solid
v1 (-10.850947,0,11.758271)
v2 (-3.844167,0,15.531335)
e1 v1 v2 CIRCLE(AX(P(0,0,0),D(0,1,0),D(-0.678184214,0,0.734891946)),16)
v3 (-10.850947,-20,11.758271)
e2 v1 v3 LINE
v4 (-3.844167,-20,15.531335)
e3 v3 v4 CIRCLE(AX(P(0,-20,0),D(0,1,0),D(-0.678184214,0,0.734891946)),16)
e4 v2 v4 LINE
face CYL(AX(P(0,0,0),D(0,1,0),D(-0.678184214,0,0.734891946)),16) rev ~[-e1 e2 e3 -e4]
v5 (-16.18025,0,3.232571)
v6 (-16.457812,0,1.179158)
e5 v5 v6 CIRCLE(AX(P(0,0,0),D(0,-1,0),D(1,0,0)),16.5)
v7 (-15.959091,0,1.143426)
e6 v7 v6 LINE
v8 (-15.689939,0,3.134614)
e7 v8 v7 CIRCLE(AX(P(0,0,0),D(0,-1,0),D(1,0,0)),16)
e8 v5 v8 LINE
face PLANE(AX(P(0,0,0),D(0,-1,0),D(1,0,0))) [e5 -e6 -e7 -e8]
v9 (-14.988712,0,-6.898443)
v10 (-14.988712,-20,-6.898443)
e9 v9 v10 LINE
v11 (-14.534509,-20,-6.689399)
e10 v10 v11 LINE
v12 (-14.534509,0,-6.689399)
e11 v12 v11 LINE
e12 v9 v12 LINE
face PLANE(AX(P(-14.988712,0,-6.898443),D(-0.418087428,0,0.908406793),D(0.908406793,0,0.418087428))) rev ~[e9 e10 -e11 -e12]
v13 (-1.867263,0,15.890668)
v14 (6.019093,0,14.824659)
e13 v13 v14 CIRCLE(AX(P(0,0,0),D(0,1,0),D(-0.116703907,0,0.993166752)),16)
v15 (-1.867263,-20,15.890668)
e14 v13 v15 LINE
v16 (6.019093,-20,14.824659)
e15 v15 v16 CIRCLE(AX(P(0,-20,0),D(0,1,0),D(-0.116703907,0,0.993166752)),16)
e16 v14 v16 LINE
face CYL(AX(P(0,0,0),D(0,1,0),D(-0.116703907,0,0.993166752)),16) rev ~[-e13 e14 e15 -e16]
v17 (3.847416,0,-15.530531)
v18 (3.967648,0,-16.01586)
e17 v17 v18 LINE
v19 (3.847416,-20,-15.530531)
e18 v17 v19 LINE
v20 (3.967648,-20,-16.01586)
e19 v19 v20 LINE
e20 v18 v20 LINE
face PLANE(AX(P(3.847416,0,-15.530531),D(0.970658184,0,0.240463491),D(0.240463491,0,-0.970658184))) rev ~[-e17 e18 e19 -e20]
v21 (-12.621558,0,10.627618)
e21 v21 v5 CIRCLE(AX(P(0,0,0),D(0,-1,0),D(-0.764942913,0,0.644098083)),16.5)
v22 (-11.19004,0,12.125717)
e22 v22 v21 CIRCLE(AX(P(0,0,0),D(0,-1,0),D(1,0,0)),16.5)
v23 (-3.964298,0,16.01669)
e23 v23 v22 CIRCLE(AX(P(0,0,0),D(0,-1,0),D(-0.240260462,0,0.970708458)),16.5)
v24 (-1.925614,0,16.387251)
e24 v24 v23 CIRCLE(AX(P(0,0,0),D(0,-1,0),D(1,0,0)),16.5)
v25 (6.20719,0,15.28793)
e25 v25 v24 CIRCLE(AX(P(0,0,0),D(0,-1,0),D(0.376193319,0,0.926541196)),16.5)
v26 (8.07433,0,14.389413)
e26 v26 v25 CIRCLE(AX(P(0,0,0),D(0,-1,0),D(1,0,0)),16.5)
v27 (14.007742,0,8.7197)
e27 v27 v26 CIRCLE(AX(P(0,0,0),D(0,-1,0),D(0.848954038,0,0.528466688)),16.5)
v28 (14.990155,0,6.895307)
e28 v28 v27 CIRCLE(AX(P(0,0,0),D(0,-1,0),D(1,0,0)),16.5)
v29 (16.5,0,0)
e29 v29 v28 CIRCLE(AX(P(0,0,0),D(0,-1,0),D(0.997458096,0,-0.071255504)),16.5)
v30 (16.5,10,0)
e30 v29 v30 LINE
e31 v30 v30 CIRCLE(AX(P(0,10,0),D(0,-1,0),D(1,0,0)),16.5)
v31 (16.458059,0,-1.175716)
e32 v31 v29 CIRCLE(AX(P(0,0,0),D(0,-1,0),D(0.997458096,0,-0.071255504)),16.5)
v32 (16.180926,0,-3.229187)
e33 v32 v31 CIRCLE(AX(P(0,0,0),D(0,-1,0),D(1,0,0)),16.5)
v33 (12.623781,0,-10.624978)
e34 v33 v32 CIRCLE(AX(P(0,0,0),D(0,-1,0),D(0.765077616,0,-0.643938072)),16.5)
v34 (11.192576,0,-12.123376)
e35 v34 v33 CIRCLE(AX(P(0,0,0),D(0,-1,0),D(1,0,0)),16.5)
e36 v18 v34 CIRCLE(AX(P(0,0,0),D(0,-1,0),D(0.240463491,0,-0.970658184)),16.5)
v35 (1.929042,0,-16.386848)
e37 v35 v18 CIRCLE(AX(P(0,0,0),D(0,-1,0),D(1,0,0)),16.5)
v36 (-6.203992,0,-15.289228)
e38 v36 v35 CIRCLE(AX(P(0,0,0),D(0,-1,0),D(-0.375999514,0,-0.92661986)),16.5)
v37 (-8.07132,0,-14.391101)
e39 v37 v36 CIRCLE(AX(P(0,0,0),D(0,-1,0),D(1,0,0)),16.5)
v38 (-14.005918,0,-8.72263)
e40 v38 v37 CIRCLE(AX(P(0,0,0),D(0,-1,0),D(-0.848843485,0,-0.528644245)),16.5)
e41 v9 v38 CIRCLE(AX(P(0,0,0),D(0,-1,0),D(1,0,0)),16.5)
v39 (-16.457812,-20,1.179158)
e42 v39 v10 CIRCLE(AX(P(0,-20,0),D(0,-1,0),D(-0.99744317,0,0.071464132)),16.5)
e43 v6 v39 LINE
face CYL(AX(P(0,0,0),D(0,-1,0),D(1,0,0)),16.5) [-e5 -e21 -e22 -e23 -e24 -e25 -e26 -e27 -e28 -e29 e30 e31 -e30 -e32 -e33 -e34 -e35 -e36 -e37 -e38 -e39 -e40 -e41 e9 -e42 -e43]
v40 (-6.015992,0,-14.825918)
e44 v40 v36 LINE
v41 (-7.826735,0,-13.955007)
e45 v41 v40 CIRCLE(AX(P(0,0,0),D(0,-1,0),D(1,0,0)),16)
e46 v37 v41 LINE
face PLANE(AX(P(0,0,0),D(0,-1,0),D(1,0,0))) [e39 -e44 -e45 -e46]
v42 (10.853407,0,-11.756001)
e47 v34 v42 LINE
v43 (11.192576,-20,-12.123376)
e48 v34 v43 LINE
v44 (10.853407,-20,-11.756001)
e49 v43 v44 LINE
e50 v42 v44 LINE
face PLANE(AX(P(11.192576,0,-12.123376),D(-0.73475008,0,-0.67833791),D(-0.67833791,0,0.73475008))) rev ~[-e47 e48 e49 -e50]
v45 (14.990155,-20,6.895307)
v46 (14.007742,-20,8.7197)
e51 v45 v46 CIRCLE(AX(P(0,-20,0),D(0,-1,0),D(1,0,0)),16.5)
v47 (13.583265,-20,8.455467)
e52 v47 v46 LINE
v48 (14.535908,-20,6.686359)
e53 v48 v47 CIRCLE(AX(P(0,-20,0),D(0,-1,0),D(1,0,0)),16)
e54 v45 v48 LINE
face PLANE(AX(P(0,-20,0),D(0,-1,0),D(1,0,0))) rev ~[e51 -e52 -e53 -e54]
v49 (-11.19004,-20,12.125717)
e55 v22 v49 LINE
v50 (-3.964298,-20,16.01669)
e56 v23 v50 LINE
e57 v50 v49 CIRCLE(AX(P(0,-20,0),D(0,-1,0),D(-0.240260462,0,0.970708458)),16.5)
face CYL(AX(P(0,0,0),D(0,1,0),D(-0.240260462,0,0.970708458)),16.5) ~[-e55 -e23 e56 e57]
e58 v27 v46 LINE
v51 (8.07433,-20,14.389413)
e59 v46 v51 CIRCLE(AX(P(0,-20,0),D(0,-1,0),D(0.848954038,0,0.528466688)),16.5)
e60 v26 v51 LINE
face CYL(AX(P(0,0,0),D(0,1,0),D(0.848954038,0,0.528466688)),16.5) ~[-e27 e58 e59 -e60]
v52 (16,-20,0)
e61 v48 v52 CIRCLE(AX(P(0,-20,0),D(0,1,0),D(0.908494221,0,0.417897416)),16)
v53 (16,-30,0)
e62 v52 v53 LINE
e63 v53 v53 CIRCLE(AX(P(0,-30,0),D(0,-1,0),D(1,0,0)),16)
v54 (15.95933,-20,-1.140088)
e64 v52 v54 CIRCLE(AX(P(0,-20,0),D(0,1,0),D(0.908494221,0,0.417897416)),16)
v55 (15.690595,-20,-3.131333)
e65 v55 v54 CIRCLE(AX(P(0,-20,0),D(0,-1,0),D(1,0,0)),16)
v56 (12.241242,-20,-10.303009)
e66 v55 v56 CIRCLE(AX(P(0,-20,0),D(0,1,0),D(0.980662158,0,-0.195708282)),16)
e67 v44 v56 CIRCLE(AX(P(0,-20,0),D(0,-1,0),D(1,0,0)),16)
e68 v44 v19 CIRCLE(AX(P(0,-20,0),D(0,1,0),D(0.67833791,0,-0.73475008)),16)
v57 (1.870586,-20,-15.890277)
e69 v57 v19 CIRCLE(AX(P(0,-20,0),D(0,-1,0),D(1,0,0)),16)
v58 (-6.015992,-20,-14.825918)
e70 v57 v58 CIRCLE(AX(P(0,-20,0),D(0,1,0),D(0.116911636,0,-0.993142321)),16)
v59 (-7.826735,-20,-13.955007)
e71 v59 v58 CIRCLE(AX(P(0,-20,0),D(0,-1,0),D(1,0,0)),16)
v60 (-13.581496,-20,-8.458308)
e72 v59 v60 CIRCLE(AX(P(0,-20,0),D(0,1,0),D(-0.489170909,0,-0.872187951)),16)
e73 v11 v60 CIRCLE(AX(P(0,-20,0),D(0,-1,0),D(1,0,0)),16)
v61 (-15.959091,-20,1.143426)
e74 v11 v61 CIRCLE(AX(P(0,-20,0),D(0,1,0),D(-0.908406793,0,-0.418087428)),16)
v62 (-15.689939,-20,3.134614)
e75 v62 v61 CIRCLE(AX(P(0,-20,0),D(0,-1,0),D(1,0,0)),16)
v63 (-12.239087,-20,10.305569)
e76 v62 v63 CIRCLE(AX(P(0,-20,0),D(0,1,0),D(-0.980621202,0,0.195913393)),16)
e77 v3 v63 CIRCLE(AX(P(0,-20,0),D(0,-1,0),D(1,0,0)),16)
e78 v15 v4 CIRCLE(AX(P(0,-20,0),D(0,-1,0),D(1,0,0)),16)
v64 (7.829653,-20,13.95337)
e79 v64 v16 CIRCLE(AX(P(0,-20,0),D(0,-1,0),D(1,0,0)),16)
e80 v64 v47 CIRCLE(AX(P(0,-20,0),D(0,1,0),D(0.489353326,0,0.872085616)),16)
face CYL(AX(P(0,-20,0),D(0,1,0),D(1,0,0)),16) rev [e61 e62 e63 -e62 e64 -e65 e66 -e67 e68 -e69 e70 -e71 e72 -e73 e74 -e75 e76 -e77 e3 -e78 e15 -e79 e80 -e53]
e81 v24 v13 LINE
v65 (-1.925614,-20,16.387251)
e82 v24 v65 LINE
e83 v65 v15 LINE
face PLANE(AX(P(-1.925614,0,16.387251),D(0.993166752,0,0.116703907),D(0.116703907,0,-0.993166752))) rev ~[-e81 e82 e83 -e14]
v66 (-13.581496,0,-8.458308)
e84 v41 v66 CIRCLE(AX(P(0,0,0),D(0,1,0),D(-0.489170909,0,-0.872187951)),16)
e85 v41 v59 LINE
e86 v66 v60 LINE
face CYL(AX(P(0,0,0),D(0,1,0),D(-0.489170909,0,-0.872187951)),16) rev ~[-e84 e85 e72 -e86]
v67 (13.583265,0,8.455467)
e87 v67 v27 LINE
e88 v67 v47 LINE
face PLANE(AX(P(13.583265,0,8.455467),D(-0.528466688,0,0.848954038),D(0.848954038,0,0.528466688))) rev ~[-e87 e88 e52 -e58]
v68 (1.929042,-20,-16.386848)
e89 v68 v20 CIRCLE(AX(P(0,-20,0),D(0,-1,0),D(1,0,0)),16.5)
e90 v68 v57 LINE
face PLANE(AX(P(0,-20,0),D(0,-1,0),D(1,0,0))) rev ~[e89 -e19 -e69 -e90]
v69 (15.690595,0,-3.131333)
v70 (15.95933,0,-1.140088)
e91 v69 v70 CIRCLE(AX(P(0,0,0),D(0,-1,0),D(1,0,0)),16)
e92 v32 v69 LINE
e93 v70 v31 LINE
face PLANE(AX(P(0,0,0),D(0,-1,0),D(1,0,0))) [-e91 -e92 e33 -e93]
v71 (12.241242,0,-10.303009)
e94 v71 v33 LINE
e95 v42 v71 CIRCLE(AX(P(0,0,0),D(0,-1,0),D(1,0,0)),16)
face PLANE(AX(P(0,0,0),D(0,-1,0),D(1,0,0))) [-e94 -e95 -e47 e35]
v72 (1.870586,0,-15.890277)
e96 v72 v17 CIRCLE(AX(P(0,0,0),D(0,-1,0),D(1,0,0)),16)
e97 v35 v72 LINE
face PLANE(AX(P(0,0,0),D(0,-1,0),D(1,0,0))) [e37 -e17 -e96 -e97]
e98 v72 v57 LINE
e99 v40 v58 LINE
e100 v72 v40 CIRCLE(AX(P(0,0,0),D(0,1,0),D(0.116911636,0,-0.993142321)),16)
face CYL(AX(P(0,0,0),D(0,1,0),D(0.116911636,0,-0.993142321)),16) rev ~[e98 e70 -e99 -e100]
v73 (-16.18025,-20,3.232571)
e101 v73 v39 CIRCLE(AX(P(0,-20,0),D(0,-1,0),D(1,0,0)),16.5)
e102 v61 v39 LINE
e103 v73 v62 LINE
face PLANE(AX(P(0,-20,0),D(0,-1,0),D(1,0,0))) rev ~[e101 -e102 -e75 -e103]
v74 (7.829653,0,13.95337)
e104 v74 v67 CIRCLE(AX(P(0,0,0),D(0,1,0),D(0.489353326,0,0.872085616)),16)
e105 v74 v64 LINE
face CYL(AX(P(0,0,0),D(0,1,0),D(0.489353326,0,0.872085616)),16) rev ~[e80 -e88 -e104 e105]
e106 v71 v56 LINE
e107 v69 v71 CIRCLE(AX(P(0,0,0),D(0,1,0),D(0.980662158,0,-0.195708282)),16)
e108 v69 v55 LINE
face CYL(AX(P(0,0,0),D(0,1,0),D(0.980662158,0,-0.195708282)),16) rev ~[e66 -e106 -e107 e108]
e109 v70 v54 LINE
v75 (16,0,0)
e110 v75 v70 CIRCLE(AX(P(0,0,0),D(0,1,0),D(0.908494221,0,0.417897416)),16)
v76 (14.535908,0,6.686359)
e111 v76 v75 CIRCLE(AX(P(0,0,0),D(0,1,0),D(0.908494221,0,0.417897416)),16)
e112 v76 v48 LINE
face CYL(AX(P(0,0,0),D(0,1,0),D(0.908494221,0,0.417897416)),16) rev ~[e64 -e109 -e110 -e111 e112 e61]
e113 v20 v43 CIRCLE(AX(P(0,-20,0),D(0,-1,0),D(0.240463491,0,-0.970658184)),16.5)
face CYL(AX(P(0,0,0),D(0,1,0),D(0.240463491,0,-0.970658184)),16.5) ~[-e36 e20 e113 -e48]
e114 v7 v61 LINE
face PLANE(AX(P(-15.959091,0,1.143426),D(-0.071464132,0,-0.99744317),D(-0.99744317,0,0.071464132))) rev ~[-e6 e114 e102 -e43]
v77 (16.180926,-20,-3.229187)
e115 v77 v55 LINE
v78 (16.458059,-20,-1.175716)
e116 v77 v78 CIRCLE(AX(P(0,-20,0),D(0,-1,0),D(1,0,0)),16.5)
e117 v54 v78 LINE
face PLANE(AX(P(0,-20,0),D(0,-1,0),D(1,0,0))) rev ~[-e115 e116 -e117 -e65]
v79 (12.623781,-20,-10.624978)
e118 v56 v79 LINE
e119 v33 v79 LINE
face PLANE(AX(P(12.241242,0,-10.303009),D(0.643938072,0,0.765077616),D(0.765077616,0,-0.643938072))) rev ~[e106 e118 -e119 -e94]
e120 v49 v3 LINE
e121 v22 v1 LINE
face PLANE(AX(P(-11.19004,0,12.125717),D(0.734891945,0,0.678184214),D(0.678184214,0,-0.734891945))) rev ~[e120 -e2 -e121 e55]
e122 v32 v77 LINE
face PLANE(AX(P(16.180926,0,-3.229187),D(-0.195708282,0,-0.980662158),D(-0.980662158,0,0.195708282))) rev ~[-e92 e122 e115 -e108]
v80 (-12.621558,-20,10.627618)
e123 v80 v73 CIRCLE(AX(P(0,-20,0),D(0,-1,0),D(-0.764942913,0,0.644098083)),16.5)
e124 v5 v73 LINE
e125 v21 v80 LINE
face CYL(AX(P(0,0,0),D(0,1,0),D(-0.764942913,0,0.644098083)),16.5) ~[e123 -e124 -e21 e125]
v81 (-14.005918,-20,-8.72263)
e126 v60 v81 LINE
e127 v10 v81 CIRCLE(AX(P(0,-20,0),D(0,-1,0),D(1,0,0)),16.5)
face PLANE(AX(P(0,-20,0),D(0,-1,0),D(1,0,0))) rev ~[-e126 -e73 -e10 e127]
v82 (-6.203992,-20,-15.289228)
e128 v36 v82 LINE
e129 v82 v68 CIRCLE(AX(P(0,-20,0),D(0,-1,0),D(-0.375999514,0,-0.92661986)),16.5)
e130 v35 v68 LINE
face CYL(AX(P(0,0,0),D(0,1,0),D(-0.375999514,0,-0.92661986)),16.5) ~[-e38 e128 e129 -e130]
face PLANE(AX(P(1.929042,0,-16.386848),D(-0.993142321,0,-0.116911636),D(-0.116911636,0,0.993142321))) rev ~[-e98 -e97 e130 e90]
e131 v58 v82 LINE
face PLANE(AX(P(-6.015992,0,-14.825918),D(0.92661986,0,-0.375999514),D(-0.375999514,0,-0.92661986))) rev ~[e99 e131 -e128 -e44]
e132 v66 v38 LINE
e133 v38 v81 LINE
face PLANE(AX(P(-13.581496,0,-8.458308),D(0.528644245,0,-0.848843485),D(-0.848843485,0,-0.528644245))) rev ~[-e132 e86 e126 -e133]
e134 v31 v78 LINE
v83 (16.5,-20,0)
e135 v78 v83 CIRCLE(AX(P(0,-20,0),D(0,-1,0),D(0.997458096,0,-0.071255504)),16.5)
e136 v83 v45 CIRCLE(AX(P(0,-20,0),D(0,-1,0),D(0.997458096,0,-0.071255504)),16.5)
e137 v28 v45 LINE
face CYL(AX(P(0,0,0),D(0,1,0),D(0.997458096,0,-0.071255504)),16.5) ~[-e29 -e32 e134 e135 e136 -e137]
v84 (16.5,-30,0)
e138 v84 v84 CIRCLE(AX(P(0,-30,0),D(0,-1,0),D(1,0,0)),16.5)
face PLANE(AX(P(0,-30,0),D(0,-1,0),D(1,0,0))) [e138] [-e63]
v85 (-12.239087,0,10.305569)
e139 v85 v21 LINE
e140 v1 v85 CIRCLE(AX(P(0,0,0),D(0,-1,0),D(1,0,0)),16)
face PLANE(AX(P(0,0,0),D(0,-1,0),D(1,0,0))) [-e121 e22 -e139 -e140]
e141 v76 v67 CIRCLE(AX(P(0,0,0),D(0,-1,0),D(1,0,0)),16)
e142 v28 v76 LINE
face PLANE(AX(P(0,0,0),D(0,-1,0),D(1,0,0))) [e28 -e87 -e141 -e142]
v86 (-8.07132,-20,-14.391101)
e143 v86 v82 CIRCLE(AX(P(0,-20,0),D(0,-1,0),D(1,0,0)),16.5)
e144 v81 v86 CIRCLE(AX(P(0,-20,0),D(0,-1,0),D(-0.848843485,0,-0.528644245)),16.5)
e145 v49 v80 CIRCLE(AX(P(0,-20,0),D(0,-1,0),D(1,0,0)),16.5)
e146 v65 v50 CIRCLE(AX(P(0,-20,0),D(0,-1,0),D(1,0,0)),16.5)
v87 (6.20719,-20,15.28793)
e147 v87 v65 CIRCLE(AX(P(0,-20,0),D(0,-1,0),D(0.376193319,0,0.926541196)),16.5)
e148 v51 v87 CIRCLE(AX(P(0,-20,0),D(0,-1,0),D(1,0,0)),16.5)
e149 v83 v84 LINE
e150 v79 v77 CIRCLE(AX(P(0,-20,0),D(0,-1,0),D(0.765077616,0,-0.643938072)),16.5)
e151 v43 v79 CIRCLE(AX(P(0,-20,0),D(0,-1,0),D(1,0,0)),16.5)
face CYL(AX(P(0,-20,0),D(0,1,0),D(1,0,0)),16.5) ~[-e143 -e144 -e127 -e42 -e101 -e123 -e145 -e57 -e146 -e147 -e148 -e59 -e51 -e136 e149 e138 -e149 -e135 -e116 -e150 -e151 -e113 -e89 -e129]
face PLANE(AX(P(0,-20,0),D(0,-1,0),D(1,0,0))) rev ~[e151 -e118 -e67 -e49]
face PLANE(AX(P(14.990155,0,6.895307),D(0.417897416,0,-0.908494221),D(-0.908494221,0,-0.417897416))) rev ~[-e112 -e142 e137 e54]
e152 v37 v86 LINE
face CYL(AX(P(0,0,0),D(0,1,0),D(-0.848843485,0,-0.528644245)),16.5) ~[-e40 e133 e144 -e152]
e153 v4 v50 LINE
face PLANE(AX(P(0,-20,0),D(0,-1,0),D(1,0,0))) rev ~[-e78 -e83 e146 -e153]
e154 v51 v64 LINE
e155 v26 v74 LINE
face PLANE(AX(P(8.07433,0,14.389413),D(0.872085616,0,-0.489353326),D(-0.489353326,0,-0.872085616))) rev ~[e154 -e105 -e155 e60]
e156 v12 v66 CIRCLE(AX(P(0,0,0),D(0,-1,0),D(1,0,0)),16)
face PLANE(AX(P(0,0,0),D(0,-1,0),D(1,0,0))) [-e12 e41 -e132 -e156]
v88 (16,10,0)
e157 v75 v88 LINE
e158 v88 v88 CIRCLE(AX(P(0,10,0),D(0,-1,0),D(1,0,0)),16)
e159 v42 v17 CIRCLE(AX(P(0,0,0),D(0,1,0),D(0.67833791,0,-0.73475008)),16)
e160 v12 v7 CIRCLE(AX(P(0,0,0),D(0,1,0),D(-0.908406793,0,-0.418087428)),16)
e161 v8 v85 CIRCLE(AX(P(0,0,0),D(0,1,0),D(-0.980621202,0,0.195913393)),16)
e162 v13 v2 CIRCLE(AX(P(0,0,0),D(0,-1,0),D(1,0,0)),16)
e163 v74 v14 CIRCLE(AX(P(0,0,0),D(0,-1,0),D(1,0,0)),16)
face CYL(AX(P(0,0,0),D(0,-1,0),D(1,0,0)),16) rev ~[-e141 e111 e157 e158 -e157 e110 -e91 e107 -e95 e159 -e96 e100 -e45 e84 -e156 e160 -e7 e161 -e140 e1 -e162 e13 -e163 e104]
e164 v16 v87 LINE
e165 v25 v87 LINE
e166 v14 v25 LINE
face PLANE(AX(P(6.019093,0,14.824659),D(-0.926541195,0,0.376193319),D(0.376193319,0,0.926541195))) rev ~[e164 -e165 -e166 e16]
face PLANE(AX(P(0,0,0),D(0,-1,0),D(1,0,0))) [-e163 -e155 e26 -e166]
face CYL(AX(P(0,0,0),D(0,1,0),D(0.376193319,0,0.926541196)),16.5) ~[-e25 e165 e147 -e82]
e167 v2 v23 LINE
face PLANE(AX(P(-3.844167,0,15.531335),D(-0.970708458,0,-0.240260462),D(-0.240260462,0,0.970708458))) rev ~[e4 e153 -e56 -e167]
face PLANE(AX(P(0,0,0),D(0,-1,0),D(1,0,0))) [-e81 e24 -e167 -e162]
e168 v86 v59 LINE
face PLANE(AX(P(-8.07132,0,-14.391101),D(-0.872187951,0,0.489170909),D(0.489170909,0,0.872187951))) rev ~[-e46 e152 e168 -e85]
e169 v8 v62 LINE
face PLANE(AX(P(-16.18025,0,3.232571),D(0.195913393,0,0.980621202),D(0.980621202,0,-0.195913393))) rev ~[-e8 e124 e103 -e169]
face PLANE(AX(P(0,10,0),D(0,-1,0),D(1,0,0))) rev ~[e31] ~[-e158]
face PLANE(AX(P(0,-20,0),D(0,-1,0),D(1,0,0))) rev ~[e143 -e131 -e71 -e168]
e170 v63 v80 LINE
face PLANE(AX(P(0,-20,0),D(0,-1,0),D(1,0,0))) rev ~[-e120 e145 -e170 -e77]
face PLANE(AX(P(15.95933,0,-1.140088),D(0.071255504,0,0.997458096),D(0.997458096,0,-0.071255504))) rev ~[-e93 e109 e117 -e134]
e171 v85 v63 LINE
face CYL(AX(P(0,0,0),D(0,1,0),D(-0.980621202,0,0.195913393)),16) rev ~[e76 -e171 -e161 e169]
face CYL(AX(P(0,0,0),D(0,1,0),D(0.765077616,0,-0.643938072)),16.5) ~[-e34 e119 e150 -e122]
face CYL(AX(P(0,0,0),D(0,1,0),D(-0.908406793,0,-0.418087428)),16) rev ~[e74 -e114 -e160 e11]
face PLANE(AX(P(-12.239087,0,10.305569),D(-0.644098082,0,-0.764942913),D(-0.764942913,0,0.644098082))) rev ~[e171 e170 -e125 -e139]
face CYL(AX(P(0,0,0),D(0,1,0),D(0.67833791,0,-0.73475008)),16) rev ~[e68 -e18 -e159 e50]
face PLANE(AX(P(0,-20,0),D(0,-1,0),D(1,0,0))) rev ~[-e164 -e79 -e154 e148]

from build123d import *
from build123d import SkipClean  # not in build123d's __all__

# Parameters (mm, degrees)
F1_DEPTH = 20
F2_R     = 16.5
F2_R_2   = 16
F3_DEPTH = 10
F4_R     = 16.5
F4_R_2   = 16
F5_DEPTH = 10


with BuildPart() as f1:
    # F0 (on Front) → F1 (new body)
    with BuildSketch(Plane.XZ):
        with BuildLine():
            Line((-3.8441673982, 15.5313353262), (-3.9642976294, 16.0166895551))
            ThreePointArc((-3.9642976294, 16.0166895551), (-7.8229406478, 14.52761507), (-11.1900395345, 12.1257171011))
            Line((-11.1900395345, 12.1257171011), (-10.8509474274, 11.7582711284))
            ThreePointArc((-10.8509474274, 11.7582711284), (-7.5858818403, 14.0873843103), (-3.8441673982, 15.5313353262))
        make_face()
    extrude(amount=F1_DEPTH)



with BuildPart() as f1b:
    # F0 (on Front) → F1, piece 2 (new body)
    with BuildSketch(Plane.XZ):
        with BuildLine():
            ThreePointArc((-15.6899392355, 3.1346142961), (-14.4174640671, 6.9380638419), (-12.2390866075, 10.3055693202))
            Line((-12.2390866075, 10.3055693202), (-12.621558064, 10.6276183614))
            ThreePointArc((-12.621558064, 10.6276183614), (-14.8680098192, 7.154878337), (-16.1802498366, 3.2325709928))
            Line((-16.1802498366, 3.2325709928), (-15.6899392355, 3.1346142961))
        make_face()
    extrude(amount=F1_DEPTH)


with BuildPart() as f1c:
    # F0 (on Front) → F1, piece 3 (new body)
    with BuildSketch(Plane.XZ):
        with BuildLine():
            Line((-15.959090724, 1.1434261073), (-16.4578123091, 1.1791581731))
            ThreePointArc((-16.4578123091, 1.1791581731), (-16.2336959024, -2.952476477), (-14.9887120925, -6.8984425639))
            Line((-14.9887120925, -6.8984425639), (-14.5345086958, -6.6893988498))
            ThreePointArc((-14.5345086958, -6.6893988498), (-15.7417657236, -2.8630074928), (-15.959090724, 1.1434261073))
        make_face()
    extrude(amount=F1_DEPTH)


with BuildPart() as f1d:
    # F0 (on Front) → F1, piece 4 (new body)
    with BuildSketch(Plane.XZ):
        with BuildLine():
            Line((-13.581495765, -8.458307915), (-14.0059175077, -8.7226300373))
            ThreePointArc((-14.0059175077, -8.7226300373), (-11.3966659743, -11.9317226195), (-8.0713200038, -14.3911011877))
            Line((-8.0713200038, -14.3911011877), (-7.8267345492, -13.9550072124))
            ThreePointArc((-7.8267345492, -13.9550072124), (-11.05131246, -11.5701552674), (-13.581495765, -8.458307915))
        make_face()
    extrude(amount=F1_DEPTH)


with BuildPart() as f1e:
    # F0 (on Front) → F1, piece 5 (new body)
    with BuildSketch(Plane.XZ):
        with BuildLine():
            Line((-6.0159922312, -14.8259177616), (-6.2039919884, -15.2892276917))
            ThreePointArc((-6.2039919884, -15.2892276917), (-2.2068058623, -16.3517585564), (1.9290419923, -16.3868482934))
            Line((1.9290419923, -16.3868482934), (1.8705861743, -15.890277133))
            ThreePointArc((1.8705861743, -15.890277133), (-2.1399329573, -15.8562507213), (-6.0159922312, -14.8259177616))
        make_face()
    extrude(amount=F1_DEPTH)


with BuildPart() as f1f:
    # F0 (on Front) → F1, piece 6 (new body)
    with BuildSketch(Plane.XZ):
        with BuildLine():
            Line((6.0190930987, 14.8246591282), (6.2071897581, 15.287929726))
            ThreePointArc((6.2071897581, 15.287929726), (2.210225959, 16.3512966217), (-1.9256144656, 16.3872514147))
            Line((-1.9256144656, 16.3872514147), (-1.8672625121, 15.8906680385))
            ThreePointArc((-1.8672625121, 15.8906680385), (2.1432494148, 15.8558027847), (6.0190930987, 14.8246591282))
        make_face()
    extrude(amount=F1_DEPTH)


with BuildPart() as f1g:
    # F0 (on Front) → F1, piece 7 (new body)
    with BuildSketch(Plane.XZ):
        with BuildLine():
            ThreePointArc((14.0077416326, 8.7197003592), (11.3991613724, 11.929338624), (8.0743298799, 14.3894126701))
            Line((8.0743298799, 14.3894126701), (7.8296532169, 13.9533698619))
            ThreePointArc((7.8296532169, 13.9533698619), (11.0537322399, 11.5678435142), (13.5832646134, 8.455467015))
            Line((13.5832646134, 8.455467015), (14.0077416326, 8.7197003592))
        make_face()
    extrude(amount=F1_DEPTH)


with BuildPart() as f1h:
    # F0 (on Front) → F1, piece 8 (new body)
    with BuildSketch(Plane.XZ):
        with BuildLine():
            ThreePointArc((16.4580585827, -1.17571582), (16.2336959024, 2.952476477), (14.9901546477, 6.8953073636))
            Line((14.9901546477, 6.8953073636), (14.5359075371, 6.6863586557))
            ThreePointArc((14.5359075371, 6.6863586557), (15.7417657236, 2.8630074928), (15.9593295347, -1.1400880679))
            Line((15.9593295347, -1.1400880679), (16.4580585827, -1.17571582))
        make_face()
    extrude(amount=F1_DEPTH)


with BuildPart() as f1i:
    # F0 (on Front) → F1, piece 9 (new body)
    with BuildSketch(Plane.XZ):
        with BuildLine():
            ThreePointArc((3.9676476045, -16.0158600296), (7.8259790826, -14.5259785005), (11.192575513, -12.1233763195))
            Line((11.192575513, -12.1233763195), (10.8534065581, -11.7560012795))
            ThreePointArc((10.8534065581, -11.7560012795), (7.5888282013, -14.0857973339), (3.8474158589, -15.5305309377))
            Line((3.8474158589, -15.5305309377), (3.9676476045, -16.0158600296))
        make_face()
    extrude(amount=F1_DEPTH)


with BuildPart() as f1j:
    # F0 (on Front) → F1, piece 10 (new body)
    with BuildSketch(Plane.XZ):
        with BuildLine():
            ThreePointArc((12.6237806679, -10.6249781952), (14.8695060132, -7.1517683773), (16.1809256095, -3.22918665))
            Line((16.1809256095, -3.22918665), (15.6905945304, -3.1313325091))
            ThreePointArc((15.6905945304, -3.1313325091), (14.4189149219, -6.9350481235), (12.2412418598, -10.303009159))
            Line((12.2412418598, -10.303009159), (12.6237806679, -10.6249781952))
        make_face()
    extrude(amount=F1_DEPTH)


with BuildPart() as f1_1:
    add(f1.part, clean=False)

    add(f1b.part)  # F3 merges F1b

    add(f1c.part)  # F3 merges F1c

    add(f1d.part)  # F3 merges F1d

    add(f1e.part)  # F3 merges F1e

    add(f1f.part)  # F3 merges F1f

    add(f1g.part)  # F3 merges F1g

    add(f1h.part)  # F3 merges F1h

    add(f1i.part)  # F3 merges F1i

    add(f1j.part)  # F3 merges F1j
    # F2 (on face) → F3 (join)
    with BuildSketch(Plane.XZ):
        Circle(F2_R)
        Circle(F2_R_2, mode=Mode.SUBTRACT)
    extrude(amount=-F3_DEPTH)

    # F4 (on face) → F5 (join)
    with BuildSketch(Plane.XZ.offset(20)):
        Circle(F4_R)
        Circle(F4_R_2, mode=Mode.SUBTRACT)
    with SkipClean():  # cleaning this boolean's faces spoils the solid; the shape is the same uncleaned
        extrude(amount=F5_DEPTH)


solid = f1_1.part
